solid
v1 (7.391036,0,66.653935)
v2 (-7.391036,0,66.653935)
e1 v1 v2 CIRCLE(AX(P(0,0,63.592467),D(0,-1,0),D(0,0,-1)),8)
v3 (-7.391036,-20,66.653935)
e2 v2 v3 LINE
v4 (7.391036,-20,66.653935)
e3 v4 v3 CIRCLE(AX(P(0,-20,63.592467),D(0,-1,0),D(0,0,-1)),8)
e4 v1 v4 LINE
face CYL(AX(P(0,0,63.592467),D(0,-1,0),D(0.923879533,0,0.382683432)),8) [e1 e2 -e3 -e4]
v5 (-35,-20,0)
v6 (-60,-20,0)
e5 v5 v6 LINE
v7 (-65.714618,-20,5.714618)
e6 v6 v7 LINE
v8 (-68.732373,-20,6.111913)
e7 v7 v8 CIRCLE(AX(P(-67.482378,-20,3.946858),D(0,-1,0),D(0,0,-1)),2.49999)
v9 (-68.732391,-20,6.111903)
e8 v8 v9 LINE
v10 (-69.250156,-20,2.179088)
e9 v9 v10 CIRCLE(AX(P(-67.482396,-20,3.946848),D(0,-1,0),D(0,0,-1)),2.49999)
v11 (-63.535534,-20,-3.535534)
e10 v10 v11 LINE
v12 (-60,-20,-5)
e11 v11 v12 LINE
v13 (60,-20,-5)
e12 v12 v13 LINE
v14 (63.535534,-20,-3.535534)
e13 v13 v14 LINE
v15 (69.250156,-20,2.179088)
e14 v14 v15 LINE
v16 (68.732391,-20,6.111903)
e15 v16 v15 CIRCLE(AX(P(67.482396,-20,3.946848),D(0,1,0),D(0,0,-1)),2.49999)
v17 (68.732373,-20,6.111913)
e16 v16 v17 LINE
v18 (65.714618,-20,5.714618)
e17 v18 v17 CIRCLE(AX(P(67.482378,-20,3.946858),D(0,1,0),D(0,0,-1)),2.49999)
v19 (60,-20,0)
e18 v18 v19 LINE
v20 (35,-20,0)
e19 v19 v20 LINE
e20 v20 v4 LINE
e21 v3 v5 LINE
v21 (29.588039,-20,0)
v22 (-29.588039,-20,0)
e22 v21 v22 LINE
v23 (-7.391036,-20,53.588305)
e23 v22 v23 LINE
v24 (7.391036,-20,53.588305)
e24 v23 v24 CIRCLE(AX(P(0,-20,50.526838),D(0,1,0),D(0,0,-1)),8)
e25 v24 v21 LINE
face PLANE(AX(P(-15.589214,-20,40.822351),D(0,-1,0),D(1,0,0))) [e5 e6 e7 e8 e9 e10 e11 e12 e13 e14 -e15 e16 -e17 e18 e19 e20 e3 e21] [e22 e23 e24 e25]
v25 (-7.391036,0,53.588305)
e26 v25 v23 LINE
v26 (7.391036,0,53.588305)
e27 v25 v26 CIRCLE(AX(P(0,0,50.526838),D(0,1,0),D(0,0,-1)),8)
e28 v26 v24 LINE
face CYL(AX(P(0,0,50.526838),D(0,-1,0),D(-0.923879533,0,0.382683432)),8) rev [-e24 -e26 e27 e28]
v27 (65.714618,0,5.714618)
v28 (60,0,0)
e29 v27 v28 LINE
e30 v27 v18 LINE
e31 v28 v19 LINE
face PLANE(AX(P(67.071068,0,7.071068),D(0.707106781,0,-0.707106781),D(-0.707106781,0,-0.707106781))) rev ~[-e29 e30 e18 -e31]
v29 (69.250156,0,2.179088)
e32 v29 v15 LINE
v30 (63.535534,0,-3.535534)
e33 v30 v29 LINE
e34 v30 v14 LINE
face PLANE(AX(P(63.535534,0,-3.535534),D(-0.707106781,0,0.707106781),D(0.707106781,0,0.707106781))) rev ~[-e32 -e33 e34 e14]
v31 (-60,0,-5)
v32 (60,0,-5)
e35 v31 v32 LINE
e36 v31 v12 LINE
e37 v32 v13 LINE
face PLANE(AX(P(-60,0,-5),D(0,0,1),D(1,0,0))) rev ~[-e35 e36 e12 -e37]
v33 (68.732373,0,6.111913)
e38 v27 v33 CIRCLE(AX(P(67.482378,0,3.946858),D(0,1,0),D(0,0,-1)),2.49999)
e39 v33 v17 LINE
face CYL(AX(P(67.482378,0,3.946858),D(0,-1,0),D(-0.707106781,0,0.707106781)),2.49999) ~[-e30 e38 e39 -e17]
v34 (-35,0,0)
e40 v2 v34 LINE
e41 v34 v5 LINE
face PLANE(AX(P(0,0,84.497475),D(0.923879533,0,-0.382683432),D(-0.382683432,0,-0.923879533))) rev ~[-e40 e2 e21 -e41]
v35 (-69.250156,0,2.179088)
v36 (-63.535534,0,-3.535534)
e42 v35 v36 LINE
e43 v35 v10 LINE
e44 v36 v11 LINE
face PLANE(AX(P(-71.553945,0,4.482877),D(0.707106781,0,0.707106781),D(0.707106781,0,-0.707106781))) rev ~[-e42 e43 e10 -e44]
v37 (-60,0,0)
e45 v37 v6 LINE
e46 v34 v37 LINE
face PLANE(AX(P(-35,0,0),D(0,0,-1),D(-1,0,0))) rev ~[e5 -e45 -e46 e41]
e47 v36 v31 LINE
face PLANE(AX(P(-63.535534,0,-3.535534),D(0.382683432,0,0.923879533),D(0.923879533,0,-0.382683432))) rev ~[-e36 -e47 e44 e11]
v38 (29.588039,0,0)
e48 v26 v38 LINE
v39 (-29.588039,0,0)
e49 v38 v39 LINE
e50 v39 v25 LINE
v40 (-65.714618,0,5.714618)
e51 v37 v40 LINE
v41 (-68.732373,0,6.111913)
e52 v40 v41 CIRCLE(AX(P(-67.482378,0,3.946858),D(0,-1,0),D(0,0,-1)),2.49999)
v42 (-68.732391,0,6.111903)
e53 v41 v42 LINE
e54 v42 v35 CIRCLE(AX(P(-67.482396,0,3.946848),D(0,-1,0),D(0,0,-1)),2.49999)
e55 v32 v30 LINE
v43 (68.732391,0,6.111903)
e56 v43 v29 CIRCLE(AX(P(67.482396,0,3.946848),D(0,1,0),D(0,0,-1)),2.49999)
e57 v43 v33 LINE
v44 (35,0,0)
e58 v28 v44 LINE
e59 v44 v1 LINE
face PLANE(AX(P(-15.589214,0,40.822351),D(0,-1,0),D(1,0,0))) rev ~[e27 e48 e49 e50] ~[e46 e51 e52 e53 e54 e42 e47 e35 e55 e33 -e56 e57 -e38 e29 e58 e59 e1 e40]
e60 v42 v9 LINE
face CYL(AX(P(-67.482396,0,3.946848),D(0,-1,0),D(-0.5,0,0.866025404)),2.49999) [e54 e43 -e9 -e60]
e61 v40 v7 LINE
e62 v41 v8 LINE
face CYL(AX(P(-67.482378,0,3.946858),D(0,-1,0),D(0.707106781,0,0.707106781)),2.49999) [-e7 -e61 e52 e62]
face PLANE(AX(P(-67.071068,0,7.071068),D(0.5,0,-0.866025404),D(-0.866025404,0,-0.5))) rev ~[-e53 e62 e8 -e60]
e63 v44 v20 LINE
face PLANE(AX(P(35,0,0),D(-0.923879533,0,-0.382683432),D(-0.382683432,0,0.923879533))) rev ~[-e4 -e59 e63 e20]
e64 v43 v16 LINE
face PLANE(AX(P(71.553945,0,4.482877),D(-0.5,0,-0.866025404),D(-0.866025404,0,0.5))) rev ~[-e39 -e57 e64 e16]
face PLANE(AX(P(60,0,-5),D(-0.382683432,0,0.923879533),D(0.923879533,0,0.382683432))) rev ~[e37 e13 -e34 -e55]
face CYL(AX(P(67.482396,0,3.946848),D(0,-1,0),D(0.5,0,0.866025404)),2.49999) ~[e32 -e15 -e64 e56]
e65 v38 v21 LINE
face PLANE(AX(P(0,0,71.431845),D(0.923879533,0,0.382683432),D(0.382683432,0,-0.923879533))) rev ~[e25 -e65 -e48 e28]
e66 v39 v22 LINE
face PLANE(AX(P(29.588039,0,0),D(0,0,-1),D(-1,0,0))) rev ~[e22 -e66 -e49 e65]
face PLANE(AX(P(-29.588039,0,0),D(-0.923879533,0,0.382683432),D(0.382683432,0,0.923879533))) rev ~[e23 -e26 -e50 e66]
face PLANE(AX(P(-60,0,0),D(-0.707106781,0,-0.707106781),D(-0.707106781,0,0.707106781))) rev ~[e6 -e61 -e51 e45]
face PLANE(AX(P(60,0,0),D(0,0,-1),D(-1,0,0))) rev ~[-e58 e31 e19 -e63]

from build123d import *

# Parameters (mm, degrees)
F1_DEPTH = 20
F2_R     = 8
F3_R     = 2.49999


# Not quite as in the source:
# - a fillet or chamfer is up to 0.001 mm smaller than in the source, because OpenCascade refuses the exact size


with BuildPart() as f1:
    # F0 (on Front) → F1 (new body)
    with BuildSketch(Plane.XZ):
        Polygon((-35, 0), (-29.5880389985, 0), (0, 71.4318450343), (0, 84.4974746831), align=None)
        Polygon((0, 71.4318450343), (29.5880389985, 0), (35, 0), (0, 84.4974746831), align=None)
        Polygon((0, -5), (0, 0), (-29.5880389985, 0), (-35, 0), (-60, 0), (-67.0710678119, 7.0710678119), (-71.5539451727, 4.4828773608), (-63.5355339059, -3.5355339059), (-60, -5), align=None)
        Polygon((29.5880389985, 0), (0, 0), (0, -5), (60, -5), (63.5355339059, -3.5355339059), (71.5539451727, 4.4828773608), (67.0710678119, 7.0710678119), (60, 0), (35, 0), align=None)
    extrude(amount=F1_DEPTH)

    # F2
    f2_edges = [f1.edges().sort_by_distance(p)[0] for p in [
        (0, -10, 84.497475),
        (0, -10, 71.431845),
    ]]
    fillet(f2_edges, radius=F2_R)

    # F3 (radius 2.5 in the source; OpenCascade refuses exactly that, so slightly less here)
    f3_edges = [f1.edges().sort_by_distance(p)[0] for p in [
        (-67.071068, -10, 7.071068),
        (-71.553945, -10, 4.482877),
        (67.071068, -10, 7.071068),
        (71.553945, -10, 4.482877),
    ]]
    fillet(f3_edges, radius=F3_R)


solid = f1.part
